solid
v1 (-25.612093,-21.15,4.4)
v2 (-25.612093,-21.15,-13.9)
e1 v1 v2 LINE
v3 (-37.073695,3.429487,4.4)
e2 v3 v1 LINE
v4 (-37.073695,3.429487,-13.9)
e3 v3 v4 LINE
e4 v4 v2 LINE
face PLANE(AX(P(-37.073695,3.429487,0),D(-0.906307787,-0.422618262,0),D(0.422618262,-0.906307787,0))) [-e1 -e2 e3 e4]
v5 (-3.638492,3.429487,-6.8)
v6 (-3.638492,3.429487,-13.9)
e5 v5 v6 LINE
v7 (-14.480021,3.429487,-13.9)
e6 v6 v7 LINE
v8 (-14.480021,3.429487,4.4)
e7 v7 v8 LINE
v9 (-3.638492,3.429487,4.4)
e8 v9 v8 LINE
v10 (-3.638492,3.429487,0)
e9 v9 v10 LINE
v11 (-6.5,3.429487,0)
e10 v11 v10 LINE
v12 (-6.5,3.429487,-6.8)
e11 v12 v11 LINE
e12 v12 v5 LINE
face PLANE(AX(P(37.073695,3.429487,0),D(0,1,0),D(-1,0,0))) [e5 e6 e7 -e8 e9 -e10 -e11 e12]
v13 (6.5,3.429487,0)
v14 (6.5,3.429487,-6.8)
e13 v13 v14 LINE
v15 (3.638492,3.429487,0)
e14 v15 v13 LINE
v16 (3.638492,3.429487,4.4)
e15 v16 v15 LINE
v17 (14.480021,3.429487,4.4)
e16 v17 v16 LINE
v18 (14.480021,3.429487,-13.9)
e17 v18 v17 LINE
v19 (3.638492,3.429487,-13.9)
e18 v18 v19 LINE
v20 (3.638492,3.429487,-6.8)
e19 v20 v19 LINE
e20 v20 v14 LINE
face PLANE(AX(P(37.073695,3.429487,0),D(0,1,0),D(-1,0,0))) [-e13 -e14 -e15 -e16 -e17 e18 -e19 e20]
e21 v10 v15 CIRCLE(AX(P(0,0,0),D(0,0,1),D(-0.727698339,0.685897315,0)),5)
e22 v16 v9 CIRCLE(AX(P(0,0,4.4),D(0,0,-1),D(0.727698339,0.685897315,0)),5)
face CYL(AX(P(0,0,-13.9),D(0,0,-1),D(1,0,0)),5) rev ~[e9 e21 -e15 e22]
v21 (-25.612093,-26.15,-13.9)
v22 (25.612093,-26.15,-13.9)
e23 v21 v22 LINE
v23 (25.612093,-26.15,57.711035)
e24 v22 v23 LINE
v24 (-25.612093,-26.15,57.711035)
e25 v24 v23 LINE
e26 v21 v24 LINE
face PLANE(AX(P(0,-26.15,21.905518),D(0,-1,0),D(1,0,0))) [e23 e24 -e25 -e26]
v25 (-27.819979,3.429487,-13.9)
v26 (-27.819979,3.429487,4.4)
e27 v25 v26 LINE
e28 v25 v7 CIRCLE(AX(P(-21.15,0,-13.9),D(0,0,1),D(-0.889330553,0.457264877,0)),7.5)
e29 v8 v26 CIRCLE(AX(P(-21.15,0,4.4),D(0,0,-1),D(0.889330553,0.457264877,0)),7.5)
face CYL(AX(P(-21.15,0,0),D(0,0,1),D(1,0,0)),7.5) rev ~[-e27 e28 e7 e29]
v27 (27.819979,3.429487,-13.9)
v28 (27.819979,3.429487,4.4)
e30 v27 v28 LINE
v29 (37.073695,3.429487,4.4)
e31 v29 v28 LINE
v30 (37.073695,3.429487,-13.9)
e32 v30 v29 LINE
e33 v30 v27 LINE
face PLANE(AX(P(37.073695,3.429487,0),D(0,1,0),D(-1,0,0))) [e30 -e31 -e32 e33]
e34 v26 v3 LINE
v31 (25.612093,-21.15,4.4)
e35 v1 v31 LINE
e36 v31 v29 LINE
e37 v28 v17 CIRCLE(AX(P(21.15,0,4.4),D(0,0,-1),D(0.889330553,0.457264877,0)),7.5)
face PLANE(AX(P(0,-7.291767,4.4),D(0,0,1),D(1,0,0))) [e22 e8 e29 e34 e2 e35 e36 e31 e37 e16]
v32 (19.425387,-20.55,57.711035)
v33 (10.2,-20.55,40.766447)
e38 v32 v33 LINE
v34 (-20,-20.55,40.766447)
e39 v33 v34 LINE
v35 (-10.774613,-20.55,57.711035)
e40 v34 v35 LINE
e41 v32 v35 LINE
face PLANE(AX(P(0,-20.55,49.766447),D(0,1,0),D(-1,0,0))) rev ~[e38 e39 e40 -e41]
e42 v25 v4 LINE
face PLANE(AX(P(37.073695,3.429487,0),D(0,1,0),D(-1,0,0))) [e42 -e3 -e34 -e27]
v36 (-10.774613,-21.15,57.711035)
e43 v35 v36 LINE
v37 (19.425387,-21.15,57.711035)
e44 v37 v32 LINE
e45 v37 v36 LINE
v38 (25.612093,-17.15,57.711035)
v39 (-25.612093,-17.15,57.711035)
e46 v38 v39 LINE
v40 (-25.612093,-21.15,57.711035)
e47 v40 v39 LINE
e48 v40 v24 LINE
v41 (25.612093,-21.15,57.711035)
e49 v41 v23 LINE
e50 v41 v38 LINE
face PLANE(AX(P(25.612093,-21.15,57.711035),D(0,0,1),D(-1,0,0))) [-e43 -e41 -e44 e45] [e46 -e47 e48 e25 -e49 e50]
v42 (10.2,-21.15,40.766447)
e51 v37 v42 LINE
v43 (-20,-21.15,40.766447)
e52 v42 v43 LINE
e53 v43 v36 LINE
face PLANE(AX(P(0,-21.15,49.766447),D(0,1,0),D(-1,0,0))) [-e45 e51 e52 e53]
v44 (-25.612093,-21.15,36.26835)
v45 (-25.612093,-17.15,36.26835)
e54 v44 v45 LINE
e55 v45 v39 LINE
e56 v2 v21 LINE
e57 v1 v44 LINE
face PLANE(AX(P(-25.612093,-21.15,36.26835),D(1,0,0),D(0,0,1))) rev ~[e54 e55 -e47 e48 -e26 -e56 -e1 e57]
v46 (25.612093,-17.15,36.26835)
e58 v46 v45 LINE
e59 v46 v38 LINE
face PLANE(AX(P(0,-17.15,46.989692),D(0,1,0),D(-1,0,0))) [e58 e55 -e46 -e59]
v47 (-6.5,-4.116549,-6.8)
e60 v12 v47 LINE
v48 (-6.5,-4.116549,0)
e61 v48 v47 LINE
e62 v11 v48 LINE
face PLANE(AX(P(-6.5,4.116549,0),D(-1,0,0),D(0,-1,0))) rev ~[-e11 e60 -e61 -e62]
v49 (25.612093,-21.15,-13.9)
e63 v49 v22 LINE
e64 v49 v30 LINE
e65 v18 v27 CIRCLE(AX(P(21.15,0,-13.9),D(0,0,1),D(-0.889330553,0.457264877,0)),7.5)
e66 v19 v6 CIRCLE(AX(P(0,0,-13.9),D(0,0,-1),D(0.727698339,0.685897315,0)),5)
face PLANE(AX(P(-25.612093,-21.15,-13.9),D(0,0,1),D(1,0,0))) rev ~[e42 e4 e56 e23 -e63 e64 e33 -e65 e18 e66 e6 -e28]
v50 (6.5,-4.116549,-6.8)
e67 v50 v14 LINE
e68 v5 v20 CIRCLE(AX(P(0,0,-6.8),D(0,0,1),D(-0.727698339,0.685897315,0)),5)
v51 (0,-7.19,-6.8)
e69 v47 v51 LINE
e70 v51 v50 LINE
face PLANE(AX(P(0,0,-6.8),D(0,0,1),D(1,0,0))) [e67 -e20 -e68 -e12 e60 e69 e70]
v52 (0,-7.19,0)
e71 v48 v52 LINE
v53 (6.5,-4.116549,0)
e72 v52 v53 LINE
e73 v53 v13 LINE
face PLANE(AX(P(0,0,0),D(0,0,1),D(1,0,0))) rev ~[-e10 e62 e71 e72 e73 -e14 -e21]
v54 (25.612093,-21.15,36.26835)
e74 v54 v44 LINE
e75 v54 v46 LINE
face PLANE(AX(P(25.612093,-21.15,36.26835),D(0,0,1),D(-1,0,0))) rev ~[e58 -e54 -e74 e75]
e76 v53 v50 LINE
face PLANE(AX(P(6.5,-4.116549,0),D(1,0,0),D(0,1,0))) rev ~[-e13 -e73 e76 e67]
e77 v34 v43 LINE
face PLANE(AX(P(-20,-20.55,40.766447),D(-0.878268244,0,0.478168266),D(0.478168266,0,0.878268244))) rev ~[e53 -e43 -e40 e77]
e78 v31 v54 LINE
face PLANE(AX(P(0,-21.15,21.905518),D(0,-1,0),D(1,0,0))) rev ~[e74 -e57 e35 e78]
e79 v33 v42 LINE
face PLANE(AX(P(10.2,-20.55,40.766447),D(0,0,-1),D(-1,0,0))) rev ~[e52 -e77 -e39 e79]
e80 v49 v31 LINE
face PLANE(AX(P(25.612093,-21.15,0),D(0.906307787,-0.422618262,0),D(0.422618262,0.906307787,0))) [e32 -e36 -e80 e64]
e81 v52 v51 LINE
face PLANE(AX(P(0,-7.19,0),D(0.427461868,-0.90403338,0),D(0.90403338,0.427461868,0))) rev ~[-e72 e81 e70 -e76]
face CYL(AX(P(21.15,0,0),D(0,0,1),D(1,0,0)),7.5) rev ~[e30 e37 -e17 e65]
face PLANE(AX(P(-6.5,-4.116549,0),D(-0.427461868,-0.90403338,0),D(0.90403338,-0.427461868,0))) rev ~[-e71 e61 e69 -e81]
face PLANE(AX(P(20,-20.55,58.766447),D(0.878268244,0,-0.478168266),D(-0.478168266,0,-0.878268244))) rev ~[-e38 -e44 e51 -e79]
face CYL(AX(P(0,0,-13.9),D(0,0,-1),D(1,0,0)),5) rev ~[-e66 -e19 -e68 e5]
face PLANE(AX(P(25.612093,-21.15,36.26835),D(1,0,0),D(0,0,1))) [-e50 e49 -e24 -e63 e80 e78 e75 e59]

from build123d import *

# Parameters (mm, degrees)
F0_R           = 7.5
F1_DEPTH       = 7.6
F1_DEPTH_BACK  = 17.3
F2_DEPTH       = 6.8
F4_DEPTH       = 4.4
F4_DEPTH_BACK  = 13.9
F6_W           = 51.2241850299
F6_H           = 71.6110350132
F7_DEPTH       = 5
F10_DEPTH      = 0.6
F11_W          = 51.2241850299
F11_H          = 21.4426852763
F12_DEPTH      = 4
F15_R          = 5
F16_DEPTH      = 25
F16_DEPTH_BACK = 25


with BuildPart() as f1:
    # F0 (on Top) → F1 (new body, two sides)
    with BuildSketch(Plane.XY) as f1_sk:
        with Locations((-21.15, 0)):
            Circle(F0_R)
    extrude(amount=F1_DEPTH)
    extrude(f1_sk.sketch, amount=-F1_DEPTH_BACK)


with BuildPart() as f1b:
    # F0 (on Top) → F1, piece 2 (new body, two sides)
    with BuildSketch(Plane.XY) as f1_2_sk:
        with Locations((21.15, 0)):
            Circle(F0_R)
    extrude(amount=F1_DEPTH)
    extrude(f1_2_sk.sketch, amount=-F1_DEPTH_BACK)


with BuildPart() as f2:
    # F0 (on Top) → F2 (new body)
    with BuildSketch(Plane.XY):
        Polygon((-6.5, 4.1165491707), (-6.5, 0), (-6.5, -4.1165491707), (0, -7.19), (6.5, -4.1165491707), (6.5, 0), (6.5, 4.1165491707), (0, 7.19), align=None)
    extrude(amount=-F2_DEPTH)


with BuildPart() as f4:
    # F3 (on Top) → F4 (new body, two sides)
    with BuildSketch(Plane.XY) as f4_sk:
        Polygon((-25.612092515, -21.15), (25.612092515, -21.15), (37.0736953387, 3.4294865757), (-37.0736953387, 3.4294865757), align=None)
    extrude(amount=F4_DEPTH)
    extrude(f4_sk.sketch, amount=-F4_DEPTH_BACK)

    # F5: cut F1, F2, F1b
    add(f1.part, mode=Mode.SUBTRACT)
    add(f2.part, mode=Mode.SUBTRACT)
    add(f1b.part, mode=Mode.SUBTRACT)

    # F6 (on face) → F7 (join)
    with BuildSketch(Plane.XZ.offset(21.15)):
        with Locations((0, 21.9055175066)):
            Rectangle(F6_W, F6_H)
    extrude(amount=F7_DEPTH)

    # F11 (on face) → F12 (join)
    with BuildSketch(Plane(origin=(0, -21.15, 0), x_dir=(-1, 0, 0), z_dir=(0, 1, 0))):
        with Locations((0, 46.9896923751)):
            Rectangle(F11_W, F11_H)
    extrude(amount=F12_DEPTH)


with BuildPart() as f10:
    # F9 (on offset) → F10 (new body)
    with BuildSketch(Plane(origin=(0, -20.55, 0), x_dir=(-1, 0, 0), z_dir=(0, 1, 0))):
        Polygon((-20, 58.7664473951), (-10.2, 40.7664473951), (20, 40.7664473951), (10.2, 58.7664473951), align=None)
    extrude(amount=-F10_DEPTH)


with BuildPart() as f4_1:
    add(f4.part)

    # F13: cut F10
    add(f10.part, mode=Mode.SUBTRACT)

    # F15 (on face) → F16 (cut, two sides)
    with BuildSketch(Plane(origin=(0, 0, -13.9), x_dir=(1, 0, 0), z_dir=(0, 0, -1))) as f16_sk:
        Circle(F15_R)
    extrude(amount=-F16_DEPTH, mode=Mode.SUBTRACT)
    extrude(f16_sk.sketch, amount=F16_DEPTH_BACK, mode=Mode.SUBTRACT)


solid = f4_1.part
